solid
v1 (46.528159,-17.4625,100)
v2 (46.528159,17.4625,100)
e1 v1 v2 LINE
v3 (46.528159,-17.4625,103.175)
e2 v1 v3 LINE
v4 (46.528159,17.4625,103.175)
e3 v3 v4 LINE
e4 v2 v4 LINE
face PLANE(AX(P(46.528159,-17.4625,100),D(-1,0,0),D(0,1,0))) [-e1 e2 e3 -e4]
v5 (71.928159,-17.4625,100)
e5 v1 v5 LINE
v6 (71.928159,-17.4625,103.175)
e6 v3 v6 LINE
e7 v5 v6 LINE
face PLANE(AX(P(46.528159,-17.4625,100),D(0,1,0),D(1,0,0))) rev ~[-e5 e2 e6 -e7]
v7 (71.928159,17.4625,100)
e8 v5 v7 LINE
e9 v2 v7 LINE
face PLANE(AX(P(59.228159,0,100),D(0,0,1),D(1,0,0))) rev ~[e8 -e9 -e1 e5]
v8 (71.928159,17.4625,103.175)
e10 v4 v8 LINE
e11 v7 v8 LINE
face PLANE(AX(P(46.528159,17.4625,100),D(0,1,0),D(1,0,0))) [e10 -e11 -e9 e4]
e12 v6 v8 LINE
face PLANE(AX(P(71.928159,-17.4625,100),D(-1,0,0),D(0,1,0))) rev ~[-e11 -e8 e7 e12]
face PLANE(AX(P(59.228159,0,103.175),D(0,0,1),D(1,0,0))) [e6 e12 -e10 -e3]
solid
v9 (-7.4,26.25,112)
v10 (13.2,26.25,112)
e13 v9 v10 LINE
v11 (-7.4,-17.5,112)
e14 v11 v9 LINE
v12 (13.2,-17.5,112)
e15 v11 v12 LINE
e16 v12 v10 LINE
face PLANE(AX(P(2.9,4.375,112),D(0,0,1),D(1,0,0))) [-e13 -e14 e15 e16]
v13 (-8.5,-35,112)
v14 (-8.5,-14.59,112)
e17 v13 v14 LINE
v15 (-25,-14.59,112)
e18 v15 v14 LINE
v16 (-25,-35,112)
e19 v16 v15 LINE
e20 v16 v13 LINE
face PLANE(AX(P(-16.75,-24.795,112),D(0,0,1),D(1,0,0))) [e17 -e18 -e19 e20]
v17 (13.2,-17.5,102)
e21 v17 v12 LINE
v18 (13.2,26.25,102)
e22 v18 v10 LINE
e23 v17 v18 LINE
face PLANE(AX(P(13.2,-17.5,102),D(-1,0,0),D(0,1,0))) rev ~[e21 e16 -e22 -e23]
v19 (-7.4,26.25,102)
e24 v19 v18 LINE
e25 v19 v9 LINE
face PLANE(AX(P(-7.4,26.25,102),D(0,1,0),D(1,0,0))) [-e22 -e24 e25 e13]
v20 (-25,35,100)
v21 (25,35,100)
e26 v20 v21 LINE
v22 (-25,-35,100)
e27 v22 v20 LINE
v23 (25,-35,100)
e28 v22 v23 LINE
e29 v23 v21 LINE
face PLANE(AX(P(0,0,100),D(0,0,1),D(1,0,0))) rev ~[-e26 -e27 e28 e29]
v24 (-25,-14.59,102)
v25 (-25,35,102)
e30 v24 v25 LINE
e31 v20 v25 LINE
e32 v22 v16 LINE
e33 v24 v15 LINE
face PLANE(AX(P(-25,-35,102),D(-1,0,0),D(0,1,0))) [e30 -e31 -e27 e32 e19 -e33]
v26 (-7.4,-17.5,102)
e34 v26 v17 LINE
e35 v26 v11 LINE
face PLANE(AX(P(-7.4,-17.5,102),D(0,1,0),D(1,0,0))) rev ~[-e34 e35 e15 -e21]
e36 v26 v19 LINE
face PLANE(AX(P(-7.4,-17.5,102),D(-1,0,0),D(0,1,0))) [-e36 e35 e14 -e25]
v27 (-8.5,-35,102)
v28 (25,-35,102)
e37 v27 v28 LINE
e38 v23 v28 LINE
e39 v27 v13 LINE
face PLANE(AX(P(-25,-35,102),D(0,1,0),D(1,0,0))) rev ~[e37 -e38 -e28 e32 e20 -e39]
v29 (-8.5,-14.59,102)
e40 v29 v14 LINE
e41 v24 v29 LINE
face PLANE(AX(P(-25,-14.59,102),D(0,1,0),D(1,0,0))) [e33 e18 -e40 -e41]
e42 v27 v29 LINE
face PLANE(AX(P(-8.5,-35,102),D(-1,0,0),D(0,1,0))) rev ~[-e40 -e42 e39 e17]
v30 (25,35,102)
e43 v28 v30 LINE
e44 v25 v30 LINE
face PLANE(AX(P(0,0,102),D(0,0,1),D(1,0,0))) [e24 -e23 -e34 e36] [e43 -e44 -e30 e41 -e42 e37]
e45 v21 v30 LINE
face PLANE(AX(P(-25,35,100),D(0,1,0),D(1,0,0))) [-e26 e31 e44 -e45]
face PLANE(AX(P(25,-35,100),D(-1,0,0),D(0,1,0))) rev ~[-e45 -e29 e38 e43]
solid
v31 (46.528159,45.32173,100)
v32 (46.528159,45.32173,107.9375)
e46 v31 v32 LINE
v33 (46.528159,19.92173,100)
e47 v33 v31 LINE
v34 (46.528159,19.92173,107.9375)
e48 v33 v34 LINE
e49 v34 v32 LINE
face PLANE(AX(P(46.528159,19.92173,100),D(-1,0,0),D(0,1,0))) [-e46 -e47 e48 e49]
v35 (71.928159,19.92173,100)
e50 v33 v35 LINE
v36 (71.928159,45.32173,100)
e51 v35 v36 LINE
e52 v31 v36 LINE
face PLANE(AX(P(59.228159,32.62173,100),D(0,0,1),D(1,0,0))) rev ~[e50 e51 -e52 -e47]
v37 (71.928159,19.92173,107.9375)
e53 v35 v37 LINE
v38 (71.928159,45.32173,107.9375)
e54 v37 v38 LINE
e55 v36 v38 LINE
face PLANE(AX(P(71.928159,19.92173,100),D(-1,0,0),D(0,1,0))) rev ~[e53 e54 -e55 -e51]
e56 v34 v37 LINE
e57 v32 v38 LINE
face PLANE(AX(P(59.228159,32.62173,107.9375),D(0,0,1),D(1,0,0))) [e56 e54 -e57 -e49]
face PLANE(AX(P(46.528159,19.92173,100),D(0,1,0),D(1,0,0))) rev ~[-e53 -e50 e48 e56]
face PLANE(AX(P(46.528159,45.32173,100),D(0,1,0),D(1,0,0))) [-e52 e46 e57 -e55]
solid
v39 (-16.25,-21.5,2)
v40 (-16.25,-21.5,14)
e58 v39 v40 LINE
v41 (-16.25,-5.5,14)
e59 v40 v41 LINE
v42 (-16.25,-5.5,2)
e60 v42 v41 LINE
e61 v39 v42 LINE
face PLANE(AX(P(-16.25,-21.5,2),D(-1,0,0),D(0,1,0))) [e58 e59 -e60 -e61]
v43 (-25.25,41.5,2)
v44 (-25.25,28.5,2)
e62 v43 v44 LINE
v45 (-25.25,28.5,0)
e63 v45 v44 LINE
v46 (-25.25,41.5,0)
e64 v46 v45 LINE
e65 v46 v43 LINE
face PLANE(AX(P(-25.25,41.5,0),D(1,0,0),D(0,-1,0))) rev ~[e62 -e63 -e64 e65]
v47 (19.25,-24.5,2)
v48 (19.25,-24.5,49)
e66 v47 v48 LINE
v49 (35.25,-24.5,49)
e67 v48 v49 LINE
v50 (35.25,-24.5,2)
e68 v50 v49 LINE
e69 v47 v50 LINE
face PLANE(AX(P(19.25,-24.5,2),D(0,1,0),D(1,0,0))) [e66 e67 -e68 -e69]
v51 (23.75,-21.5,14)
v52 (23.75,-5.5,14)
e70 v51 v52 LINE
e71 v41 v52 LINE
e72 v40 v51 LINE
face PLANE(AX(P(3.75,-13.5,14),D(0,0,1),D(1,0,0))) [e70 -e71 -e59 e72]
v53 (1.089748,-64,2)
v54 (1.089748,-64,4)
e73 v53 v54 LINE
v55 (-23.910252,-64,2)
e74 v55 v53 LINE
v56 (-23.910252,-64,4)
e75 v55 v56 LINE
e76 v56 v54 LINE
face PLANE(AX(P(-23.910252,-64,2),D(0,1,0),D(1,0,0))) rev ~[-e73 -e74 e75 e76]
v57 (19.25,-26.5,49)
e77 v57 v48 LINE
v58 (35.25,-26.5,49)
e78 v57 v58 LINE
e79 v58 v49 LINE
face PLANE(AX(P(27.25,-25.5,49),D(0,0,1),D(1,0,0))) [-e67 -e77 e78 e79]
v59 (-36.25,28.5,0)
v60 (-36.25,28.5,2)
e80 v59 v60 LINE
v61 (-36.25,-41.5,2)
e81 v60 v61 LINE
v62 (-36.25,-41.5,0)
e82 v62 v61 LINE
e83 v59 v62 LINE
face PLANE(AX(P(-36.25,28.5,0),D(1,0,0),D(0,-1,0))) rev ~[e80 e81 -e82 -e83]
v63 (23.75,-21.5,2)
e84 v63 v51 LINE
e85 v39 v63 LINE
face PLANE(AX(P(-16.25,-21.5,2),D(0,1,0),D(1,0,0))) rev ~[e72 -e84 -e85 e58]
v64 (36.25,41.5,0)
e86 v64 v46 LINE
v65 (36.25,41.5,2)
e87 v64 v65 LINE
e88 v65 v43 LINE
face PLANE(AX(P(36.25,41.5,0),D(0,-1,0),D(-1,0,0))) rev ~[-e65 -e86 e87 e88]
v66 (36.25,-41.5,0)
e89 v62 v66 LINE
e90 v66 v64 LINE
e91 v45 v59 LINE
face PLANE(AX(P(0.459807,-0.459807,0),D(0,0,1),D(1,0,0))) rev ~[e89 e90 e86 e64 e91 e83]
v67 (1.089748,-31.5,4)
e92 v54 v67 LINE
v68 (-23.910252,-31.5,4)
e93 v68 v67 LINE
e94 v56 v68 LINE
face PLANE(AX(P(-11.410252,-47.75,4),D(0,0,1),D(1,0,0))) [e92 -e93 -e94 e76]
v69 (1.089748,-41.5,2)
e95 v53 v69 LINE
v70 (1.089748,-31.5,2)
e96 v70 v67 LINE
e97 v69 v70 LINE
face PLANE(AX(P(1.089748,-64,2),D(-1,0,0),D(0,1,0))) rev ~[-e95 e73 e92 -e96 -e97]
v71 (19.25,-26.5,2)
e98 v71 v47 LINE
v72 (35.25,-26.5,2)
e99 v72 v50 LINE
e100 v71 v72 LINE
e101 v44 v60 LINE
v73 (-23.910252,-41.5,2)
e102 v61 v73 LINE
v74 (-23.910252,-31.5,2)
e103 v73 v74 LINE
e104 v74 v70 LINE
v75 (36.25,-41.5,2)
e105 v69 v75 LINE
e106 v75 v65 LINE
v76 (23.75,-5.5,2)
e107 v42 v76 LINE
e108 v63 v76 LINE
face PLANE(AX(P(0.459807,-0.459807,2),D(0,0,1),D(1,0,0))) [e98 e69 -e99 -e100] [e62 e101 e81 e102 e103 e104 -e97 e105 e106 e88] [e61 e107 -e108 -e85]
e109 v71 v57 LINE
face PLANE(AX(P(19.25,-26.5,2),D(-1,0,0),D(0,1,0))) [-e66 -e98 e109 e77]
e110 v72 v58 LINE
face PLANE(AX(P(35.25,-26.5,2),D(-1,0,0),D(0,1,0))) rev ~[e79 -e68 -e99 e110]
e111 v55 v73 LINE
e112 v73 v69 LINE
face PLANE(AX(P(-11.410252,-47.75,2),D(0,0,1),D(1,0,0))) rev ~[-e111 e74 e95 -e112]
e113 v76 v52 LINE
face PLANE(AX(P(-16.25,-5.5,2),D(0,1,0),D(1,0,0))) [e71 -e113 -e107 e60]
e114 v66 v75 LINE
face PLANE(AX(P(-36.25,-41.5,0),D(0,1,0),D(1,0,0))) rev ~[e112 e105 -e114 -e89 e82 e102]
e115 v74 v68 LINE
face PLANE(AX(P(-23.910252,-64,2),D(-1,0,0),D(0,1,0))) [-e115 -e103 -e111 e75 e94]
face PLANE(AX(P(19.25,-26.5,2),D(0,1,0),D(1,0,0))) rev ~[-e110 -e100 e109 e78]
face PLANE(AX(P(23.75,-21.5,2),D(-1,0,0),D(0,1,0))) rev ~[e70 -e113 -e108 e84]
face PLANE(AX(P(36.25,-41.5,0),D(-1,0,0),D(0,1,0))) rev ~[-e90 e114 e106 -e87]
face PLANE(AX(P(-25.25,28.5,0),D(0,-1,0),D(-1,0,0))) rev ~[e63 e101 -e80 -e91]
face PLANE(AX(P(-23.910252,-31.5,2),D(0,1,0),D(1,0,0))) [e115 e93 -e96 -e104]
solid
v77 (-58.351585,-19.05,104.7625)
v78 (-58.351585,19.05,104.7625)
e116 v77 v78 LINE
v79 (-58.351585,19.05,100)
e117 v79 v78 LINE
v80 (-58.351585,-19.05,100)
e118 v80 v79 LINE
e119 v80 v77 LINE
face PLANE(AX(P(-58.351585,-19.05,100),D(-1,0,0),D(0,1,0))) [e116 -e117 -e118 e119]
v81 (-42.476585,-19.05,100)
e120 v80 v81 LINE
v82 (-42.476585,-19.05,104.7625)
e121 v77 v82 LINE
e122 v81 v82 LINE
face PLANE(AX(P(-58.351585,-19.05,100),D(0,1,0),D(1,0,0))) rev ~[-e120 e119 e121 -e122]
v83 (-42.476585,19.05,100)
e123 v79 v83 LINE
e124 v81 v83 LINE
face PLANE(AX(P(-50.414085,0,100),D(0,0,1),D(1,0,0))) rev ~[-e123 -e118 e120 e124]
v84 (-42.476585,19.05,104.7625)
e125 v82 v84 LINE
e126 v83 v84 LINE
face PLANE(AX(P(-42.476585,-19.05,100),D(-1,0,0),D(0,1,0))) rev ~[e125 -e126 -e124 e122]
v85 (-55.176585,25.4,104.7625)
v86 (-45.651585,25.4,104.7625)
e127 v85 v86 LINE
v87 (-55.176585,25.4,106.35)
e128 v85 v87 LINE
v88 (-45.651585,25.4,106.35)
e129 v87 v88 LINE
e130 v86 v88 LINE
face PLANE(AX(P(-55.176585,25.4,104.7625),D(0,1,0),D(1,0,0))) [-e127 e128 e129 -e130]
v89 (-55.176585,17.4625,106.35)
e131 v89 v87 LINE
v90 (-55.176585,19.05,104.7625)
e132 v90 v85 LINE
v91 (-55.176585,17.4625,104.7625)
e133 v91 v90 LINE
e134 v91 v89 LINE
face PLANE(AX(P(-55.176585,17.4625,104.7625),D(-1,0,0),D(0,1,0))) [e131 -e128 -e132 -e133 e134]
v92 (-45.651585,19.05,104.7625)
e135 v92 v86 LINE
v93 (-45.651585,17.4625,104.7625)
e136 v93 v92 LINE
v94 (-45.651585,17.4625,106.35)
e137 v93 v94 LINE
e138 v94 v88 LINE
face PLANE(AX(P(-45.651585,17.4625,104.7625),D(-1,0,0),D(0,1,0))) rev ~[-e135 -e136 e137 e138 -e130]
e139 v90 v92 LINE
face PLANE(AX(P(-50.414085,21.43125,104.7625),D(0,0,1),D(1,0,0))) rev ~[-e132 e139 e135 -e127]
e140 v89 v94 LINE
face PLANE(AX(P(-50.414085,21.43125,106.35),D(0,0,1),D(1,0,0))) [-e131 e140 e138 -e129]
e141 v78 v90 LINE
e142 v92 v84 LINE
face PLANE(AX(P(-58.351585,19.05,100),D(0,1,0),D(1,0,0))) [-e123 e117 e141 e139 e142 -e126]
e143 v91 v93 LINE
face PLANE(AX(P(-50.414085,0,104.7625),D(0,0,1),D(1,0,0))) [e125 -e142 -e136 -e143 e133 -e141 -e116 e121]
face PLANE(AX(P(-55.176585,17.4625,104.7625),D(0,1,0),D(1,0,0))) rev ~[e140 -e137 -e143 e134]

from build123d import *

# Parameters (mm, degrees)
F1_DEPTH  = 2
F2_W      = 25
F2_H      = 32.5
F3_DEPTH  = 2
F4_W      = 16
F4_H      = 2
F5_DEPTH  = 47
F6_W      = 40
F6_H      = 16
F7_DEPTH  = 12
F9_W      = 50
F9_H      = 70
F10_DEPTH = 2
F11_W     = 15.875
F11_H     = 38.1
F12_DEPTH = 4.7625
F13_W     = 9.525
F13_H     = 7.9375
F14_DEPTH = 1.5875
F15_W     = 25.4
F15_H     = 34.925
F16_DEPTH = 3.175
F17_W     = 25.4
F17_H     = 25.4
F18_DEPTH = 7.9375
F19_W     = 20.6
F19_H     = 43.75
F19_W_2   = 16.5
F19_H_2   = 20.41
F20_DEPTH = 10


# Not quite as in the source:
# - a length typed as a fraction of an inch, garbled in the dataset ("3 / 203.2 mm" for 3/8 in), is restored


with BuildPart() as f1:
    # F0 (on Top) → F1 (new body)
    with BuildSketch(Plane.XY):
        Polygon((36.25, -41.5), (36.25, 41.5), (-25.25, 41.5), (-25.25, 28.5), (-36.25, 28.5), (-36.25, -41.5), align=None)
    extrude(amount=F1_DEPTH)

    # F2 (on face) → F3 (join)
    with BuildSketch(Plane.XY.offset(2)):
        with Locations((-11.410252214, -47.75)):
            Rectangle(F2_W, F2_H)
    extrude(amount=F3_DEPTH)

    # F4 (on face) → F5 (join)
    with BuildSketch(Plane.XY.offset(2)):
        with Locations((27.25, -25.5)):
            Rectangle(F4_W, F4_H)
    extrude(amount=F5_DEPTH)

    # F6 (on face) → F7 (join)
    with BuildSketch(Plane.XY.offset(2)):
        with Locations((3.75, -13.5)):
            Rectangle(F6_W, F6_H)
    extrude(amount=F7_DEPTH)


with BuildPart() as f10:
    # F9 (on offset) → F10 (new body)
    with BuildSketch(Plane.XY.offset(100)):
        Rectangle(F9_W, F9_H)
    extrude(amount=F10_DEPTH)

    # F19 (on face) → F20 (join)
    with BuildSketch(Plane.XY.offset(102)):
        with Locations((2.9, 4.375)):
            Rectangle(F19_W, F19_H)
        with Locations((-16.75, -24.795)):
            Rectangle(F19_W_2, F19_H_2)
    extrude(amount=F20_DEPTH)


with BuildPart() as f12:
    # F11 (on offset) → F12 (new body)
    with BuildSketch(Plane.XY.offset(100)):
        with Locations((-50.4140848588, 0)):
            Rectangle(F11_W, F11_H)
    extrude(amount=F12_DEPTH)

    # F13 (on face) → F14 (join)
    with BuildSketch(Plane.XY.offset(104.7625)):
        with Locations((-50.4140848588, 21.43125)):
            Rectangle(F13_W, F13_H)
    extrude(amount=F14_DEPTH)


with BuildPart() as f16:
    # F15 (on offset) → F16 (new body)
    with BuildSketch(Plane.XY.offset(100)):
        with Locations((59.2281589311, 0)):
            Rectangle(F15_W, F15_H)
    extrude(amount=F16_DEPTH)


with BuildPart() as f18:
    # F17 (on offset) → F18 (new body)
    with BuildSketch(Plane.XY.offset(100)):
        with Locations((59.2281589311, 32.621730119)):
            Rectangle(F17_W, F17_H)
    extrude(amount=F18_DEPTH)


solid = Compound([f1.part, f10.part, f12.part, f16.part, f18.part])
